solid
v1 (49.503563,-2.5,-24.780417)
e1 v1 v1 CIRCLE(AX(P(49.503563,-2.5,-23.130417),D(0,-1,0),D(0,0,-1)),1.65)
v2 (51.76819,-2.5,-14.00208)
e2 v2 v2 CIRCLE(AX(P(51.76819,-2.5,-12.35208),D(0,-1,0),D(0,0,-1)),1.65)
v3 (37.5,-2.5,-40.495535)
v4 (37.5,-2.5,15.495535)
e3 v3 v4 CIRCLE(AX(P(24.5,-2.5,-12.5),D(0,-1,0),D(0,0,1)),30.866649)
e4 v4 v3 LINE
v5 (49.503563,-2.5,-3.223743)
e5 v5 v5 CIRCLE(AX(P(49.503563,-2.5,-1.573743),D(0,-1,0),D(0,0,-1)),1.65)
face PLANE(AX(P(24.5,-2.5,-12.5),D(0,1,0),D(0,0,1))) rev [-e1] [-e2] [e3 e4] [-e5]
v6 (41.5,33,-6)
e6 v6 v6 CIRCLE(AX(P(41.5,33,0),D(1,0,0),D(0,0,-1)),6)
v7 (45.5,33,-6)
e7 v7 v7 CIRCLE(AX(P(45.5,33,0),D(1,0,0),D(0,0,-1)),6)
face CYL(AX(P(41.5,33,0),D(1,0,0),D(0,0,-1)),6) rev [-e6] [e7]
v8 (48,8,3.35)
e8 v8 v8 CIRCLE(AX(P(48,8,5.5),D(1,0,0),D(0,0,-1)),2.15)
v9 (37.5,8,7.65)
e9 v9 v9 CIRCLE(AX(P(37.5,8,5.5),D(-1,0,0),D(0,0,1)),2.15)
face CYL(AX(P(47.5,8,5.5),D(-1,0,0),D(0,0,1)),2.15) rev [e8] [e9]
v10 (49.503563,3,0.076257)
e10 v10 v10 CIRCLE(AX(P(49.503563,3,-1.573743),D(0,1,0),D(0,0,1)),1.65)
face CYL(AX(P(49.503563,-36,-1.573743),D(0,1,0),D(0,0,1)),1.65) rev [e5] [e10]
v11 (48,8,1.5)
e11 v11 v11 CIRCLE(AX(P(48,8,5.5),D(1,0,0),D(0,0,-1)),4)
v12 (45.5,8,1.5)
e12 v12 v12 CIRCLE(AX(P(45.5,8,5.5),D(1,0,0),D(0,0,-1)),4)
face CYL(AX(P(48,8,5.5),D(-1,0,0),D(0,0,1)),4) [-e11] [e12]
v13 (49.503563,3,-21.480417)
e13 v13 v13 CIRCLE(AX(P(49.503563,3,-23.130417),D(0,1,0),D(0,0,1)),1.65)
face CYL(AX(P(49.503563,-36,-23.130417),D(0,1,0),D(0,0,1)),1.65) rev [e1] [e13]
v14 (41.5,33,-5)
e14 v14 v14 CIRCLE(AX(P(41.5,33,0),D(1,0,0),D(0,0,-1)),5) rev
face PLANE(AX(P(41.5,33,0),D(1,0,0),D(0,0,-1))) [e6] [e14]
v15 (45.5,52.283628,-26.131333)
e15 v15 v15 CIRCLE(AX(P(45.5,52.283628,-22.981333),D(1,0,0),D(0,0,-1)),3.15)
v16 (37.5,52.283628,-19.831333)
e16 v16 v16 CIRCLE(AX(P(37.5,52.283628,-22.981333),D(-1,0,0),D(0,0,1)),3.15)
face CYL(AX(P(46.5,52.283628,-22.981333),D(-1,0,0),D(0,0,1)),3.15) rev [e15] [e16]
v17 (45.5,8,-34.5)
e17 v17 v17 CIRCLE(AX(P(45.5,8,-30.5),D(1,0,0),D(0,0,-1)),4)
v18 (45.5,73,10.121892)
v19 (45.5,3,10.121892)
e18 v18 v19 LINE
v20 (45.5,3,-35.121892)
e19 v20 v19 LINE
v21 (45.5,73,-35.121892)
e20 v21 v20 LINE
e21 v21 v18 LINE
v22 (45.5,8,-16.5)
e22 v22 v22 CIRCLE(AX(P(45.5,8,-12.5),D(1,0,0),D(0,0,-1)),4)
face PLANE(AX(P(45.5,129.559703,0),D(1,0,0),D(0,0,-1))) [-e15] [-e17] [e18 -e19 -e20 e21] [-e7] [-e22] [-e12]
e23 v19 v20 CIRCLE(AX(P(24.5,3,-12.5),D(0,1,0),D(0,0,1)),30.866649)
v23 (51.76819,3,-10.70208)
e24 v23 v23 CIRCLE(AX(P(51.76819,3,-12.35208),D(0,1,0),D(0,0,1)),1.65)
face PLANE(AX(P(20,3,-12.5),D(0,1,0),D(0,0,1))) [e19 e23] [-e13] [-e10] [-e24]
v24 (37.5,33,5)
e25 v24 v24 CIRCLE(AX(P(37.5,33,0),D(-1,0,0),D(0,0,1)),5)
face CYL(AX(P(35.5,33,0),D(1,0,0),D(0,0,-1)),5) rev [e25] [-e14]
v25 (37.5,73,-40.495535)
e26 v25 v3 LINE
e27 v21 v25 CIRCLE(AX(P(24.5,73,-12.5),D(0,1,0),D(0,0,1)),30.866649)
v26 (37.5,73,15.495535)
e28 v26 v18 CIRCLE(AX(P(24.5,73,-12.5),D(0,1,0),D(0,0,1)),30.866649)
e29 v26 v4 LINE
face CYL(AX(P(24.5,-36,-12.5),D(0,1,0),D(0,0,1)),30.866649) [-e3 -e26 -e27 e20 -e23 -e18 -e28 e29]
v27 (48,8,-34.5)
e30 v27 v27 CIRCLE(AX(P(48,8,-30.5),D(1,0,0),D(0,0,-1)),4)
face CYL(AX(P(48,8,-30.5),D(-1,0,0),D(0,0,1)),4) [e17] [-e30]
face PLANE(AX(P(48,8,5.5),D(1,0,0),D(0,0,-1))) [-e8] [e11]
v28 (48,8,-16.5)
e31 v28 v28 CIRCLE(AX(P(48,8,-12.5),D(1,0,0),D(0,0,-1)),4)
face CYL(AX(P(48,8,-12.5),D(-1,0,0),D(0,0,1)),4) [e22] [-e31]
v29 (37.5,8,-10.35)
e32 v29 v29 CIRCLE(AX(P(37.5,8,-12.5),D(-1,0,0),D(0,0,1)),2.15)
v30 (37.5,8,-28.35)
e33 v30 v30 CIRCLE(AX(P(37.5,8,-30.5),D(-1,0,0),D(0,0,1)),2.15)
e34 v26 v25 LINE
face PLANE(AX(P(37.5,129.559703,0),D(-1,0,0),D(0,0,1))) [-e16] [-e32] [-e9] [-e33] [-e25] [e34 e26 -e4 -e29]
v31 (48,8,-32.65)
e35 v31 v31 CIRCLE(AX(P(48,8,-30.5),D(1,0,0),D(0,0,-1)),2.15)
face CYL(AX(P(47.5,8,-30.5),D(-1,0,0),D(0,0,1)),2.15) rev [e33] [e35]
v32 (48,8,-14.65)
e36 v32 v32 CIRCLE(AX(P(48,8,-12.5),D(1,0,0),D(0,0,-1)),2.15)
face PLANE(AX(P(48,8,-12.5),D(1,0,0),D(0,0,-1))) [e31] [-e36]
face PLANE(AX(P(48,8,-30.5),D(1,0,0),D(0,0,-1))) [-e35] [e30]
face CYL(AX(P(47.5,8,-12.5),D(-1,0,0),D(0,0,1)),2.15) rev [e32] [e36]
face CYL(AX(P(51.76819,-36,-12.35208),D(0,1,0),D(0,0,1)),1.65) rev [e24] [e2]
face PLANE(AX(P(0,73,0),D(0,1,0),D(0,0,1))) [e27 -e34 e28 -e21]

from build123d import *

# Parameters (mm, degrees)
SKETCH1_R                = 28
BOSS_EXTRUDE1_DEPTH      = 3
SKETCH2_R                = 1.625
CUT_EXTRUDE1_DEPTH       = 3
BOSS_EXTRUDE4_START      = 3
BOSS_EXTRUDE4_OUTLINE_R  = 1.625
BOSS_EXTRUDE4_DEPTH      = 70
BOSS_EXTRUDE6_DEPTH      = 7
CUT_EXTRUDE13_START      = -10
CUT_EXTRUDE13_DEPTH      = 10
SKETCH14_R               = 6
CUT_EXTRUDE7_DEPTH       = 4
SKETCH15_R               = 5
CUT_EXTRUDE8_DEPTH       = 37
SKETCH17_R               = 2.15
CUT_EXTRUDE10_DEPTH      = 15.8
CUT_EXTRUDE11_DEPTH      = 5
CUT_EXTRUDE12_START      = -3
CUT_EXTRUDE12_DEPTH      = 3
SKETCH21_W               = 20.621892052
SKETCH21_H               = 10
BOSS_EXTRUDE7_DEPTH      = 7
SKETCH23_R               = 2.15
CUT_EXTRUDE17_DEPTH      = 23
SKETCH25_W               = 2
SKETCH25_H               = 4.7
CUT_EXTRUDE19_DEPTH      = 5
SKETCH26_W               = 20.621892052
SKETCH26_H               = 58
CUT_EXTRUDE21_DEPTH      = 5
CUT_EXTRUDE22_DEPTH      = 5
SKETCH41_R               = 1.625
CUT_EXTRUDE23_DEPTH      = 70
CUT_EXTRUDE24_START      = -39
CUT_EXTRUDE24_DEPTH      = 39
BOSS_EXTRUDE12_START     = -3
SKETCH43_R               = 30.866648668
BOSS_EXTRUDE12_DEPTH     = 3
BOSS_EXTRUDE13_DEPTH     = 70
BOSS_EXTRUDE14_DEPTH     = 70
SKETCH47_R               = 1.625
SKETCH47_R_2             = 1.65
CUT_EXTRUDE26_DEPTH      = 39
SKETCH48_R               = 3.15
CUT_EXTRUDE27_DEPTH      = 39
SKETCH49_R               = 5
CUT_EXTRUDE28_DEPTH      = 10
SKETCH50_R               = 6
CUT_EXTRUDE29_DEPTH      = 4
SKETCH51_R               = 3
CUT_EXTRUDE30_DEPTH      = 2.5
CUT_EXTRUDE31_DEPTH      = 82
CUT_EXTRUDE31_DEPTH_BACK = 10
SKETCH53_R               = 2.15
CUT_EXTRUDE32_DEPTH      = 10
SKETCH54_R               = 4
SKETCH54_R_2             = 2.15
BOSS_EXTRUDE15_DEPTH     = 2.5
SKETCH55_R               = 1.65
BOSS_EXTRUDE16_DEPTH     = 2.5


# Read off the part's stored shape, not the designer's step: Boss-Extrude4, Cut-Extrude13
with BuildPart() as part:
    # Sketch1 → Boss-Extrude1 (new body)
    with BuildSketch(Plane(origin=(0, 0, 0), x_dir=(1, 0, 0), z_dir=(0, 1, 0))):
        with Locations(Location((20, 12.5, 0), (0, 0, 270))):
            Circle(SKETCH1_R)
    extrude(amount=BOSS_EXTRUDE1_DEPTH)

    # Sketch2 → Cut-Extrude1 (cut)
    with BuildSketch(Plane(origin=(0, 3, 0), x_dir=(1, 0, 0), z_dir=(0, 1, 0))):
        with Locations(Location((20, 19.5, 0), (0, 0, 270))):
            Circle(SKETCH2_R)
        with Locations(Location((20, 5.5, 0), (0, 0, 270))):
            Circle(SKETCH2_R)
        with Locations(Location((20, 12.5, 0), (0, 0, 270))):
            Circle(SKETCH2_R)
    extrude(amount=-CUT_EXTRUDE1_DEPTH, mode=Mode.SUBTRACT)

    # Boss-Extrude4 outline → Boss-Extrude4 (add)
    with BuildSketch(Plane(origin=(0, 0, 0), x_dir=(1, 0, 0), z_dir=(0, 1, 0)).offset(BOSS_EXTRUDE4_START)):
        with BuildLine():
            ThreePointArc((3.5, -10.121892052), (48, 12.5), (3.5, 35.121892052))
            Line((3.5, 35.121892052), (3.5, -10.121892052))
        make_face()
        with Locations((20, 5.5)):
            Circle(BOSS_EXTRUDE4_OUTLINE_R, mode=Mode.SUBTRACT)
        with Locations((20, 12.5)):
            Circle(BOSS_EXTRUDE4_OUTLINE_R, mode=Mode.SUBTRACT)
        with Locations((20, 19.5)):
            Circle(BOSS_EXTRUDE4_OUTLINE_R, mode=Mode.SUBTRACT)
    extrude(amount=BOSS_EXTRUDE4_DEPTH)

    # Sketch13 → Boss-Extrude6 (add)
    with BuildSketch(Plane.ZY.offset(-3.5)):
        Polygon((-10, 23), (10, 23), (10.121892052, 23), (10.121892052, 15), (10, 15), (-10, 15), (-10.5, 15), (-10.5, 23), align=None)
    extrude(amount=BOSS_EXTRUDE6_DEPTH)

    # Cut-Extrude13 outline → Cut-Extrude13 (cut)
    with BuildSketch(Plane.ZY.offset(-3.5).offset(CUT_EXTRUDE13_START)):
        with BuildLine():
            Line((-10.5, 33), (-10.5, 23))
            Line((-10.5, 23), (10.121892052, 23))
            Line((10.121892052, 23), (10.121892052, 35.792364821))
            ThreePointArc((10.121892052, 35.792364821), (-1.408923961, 43.405043646), (-10.5, 33))
        make_face()
    extrude(amount=CUT_EXTRUDE13_DEPTH, mode=Mode.SUBTRACT)

    # Sketch14 → Cut-Extrude7 (cut)
    with BuildSketch(Plane.ZY.offset(-3.5)):
        with Locations((-22.981333294, 52.283628291)):
            Circle(SKETCH14_R)
    extrude(amount=-CUT_EXTRUDE7_DEPTH, mode=Mode.SUBTRACT)

    # Sketch15 → Cut-Extrude8 (cut)
    with BuildSketch(Plane.ZY.offset(-7.5)):
        with Locations((-22.981333294, 52.283628291)):
            Circle(SKETCH15_R)
    extrude(amount=-CUT_EXTRUDE8_DEPTH, mode=Mode.SUBTRACT)

    # Sketch17 → Cut-Extrude10 (cut)
    with BuildSketch(Plane.ZY.offset(3.5)):
        with Locations((-5, 18.2)):
            Circle(SKETCH17_R)
        with Locations((5, 18.2)):
            Circle(SKETCH17_R)
    extrude(amount=-CUT_EXTRUDE10_DEPTH, mode=Mode.SUBTRACT)

    # Sketch18 → Cut-Extrude11 (cut)
    with BuildSketch(Plane.ZY.offset(3.5)):
        Polygon((-0.189053974, 23), (1, 23), (1, 18), (-1, 18), (-1, 23), align=None)
    extrude(amount=-CUT_EXTRUDE11_DEPTH, mode=Mode.SUBTRACT)

    # Sketch19 → Cut-Extrude12 (cut)
    with BuildSketch(Plane.ZY.offset(-3.5).offset(CUT_EXTRUDE12_START)):
        with BuildLine():
            Line((10.121892052, 63), (10.121892052, 35.792364821))
            ThreePointArc((10.121892052, 35.792364821), (-1.408923961, 43.405043646), (-10.5, 33))
            Line((-10.5, 33), (-10.5, 62))
            Line((-10.5, 62), (-10.5, 63))
            Line((-10.5, 63), (10.121892052, 63))
        make_face()
    extrude(amount=CUT_EXTRUDE12_DEPTH, mode=Mode.SUBTRACT)

    # Sketch21 → Boss-Extrude7 (add)
    with BuildSketch(Plane.ZY.offset(-3.5)):
        with Locations((-0.189053974, 68)):
            Rectangle(SKETCH21_W, SKETCH21_H)
    extrude(amount=BOSS_EXTRUDE7_DEPTH)

    # Sketch23 → Cut-Extrude17 (cut)
    with BuildSketch(Plane.ZY.offset(3.5)):
        with Locations((-5, 67.7)):
            Circle(SKETCH23_R)
        with Locations((5, 67.7)):
            Circle(SKETCH23_R)
    extrude(amount=-CUT_EXTRUDE17_DEPTH, mode=Mode.SUBTRACT)

    # Sketch25 → Cut-Extrude19 (cut)
    with BuildSketch(Plane.ZY.offset(3.5)):
        with Locations((0, 65.35)):
            Rectangle(SKETCH25_W, SKETCH25_H)
    extrude(amount=-CUT_EXTRUDE19_DEPTH, mode=Mode.SUBTRACT)

    # Sketch26 → Cut-Extrude21 (cut)
    with BuildSketch(Plane.ZY.offset(3.5)):
        with Locations((-0.189053974, 44)):
            Rectangle(SKETCH26_W, SKETCH26_H)
    extrude(amount=-CUT_EXTRUDE21_DEPTH, mode=Mode.SUBTRACT)

    # Sketch27 → Cut-Extrude22 (cut)
    with BuildSketch(Plane.ZY.offset(-6.5)):
        Polygon((10.121892052, 63), (-10.5, 63), (-10.5, 33), (10.121892052, 35.792364821), align=None)
    extrude(amount=-CUT_EXTRUDE22_DEPTH, mode=Mode.SUBTRACT)

    # Sketch41 → Cut-Extrude23 (cut)
    with BuildSketch(Plane(origin=(0, 73, 0), x_dir=(1, 0, 0), z_dir=(0, 1, 0))):
        with BuildLine():
            Line((11.5, 39.178643144), (11.5, 10.5))
            Line((11.5, 10.5), (11.5, -14.178643144))
            ThreePointArc((11.5, -14.178643144), (48, 12.5), (11.5, 39.178643144))
        make_face()
        with Locations(Location((20, 5.5, 0), (0, 0, 270))):
            Circle(SKETCH41_R, mode=Mode.SUBTRACT)
        with Locations(Location((20, 12.5, 0), (0, 0, 270))):
            Circle(SKETCH41_R, mode=Mode.SUBTRACT)
        with Locations(Location((20, 19.5, 0), (0, 0, 270))):
            Circle(SKETCH41_R, mode=Mode.SUBTRACT)
    extrude(amount=-CUT_EXTRUDE23_DEPTH, mode=Mode.SUBTRACT)

    # Sketch42 → Cut-Extrude24 (cut)
    with BuildSketch(Plane(origin=(0, 3, 0), x_dir=(1, 0, 0), z_dir=(0, 1, 0)).offset(CUT_EXTRUDE24_START)):
        with BuildLine():
            ThreePointArc((3.5, 35.121892052), (-6.366648668, 12.5), (3.5, -10.121892052))
            ThreePointArc((3.5, -10.121892052), (-8, 12.5), (3.5, 35.121892052))
        make_face()
    extrude(amount=CUT_EXTRUDE24_DEPTH, mode=Mode.SUBTRACT)

    # Sketch43 → Boss-Extrude12 (add)
    with BuildSketch(Plane(origin=(0, 3, 0), x_dir=(1, 0, 0), z_dir=(0, 1, 0)).offset(BOSS_EXTRUDE12_START)):
        with Locations(Location((24.5, 12.5, 0), (0, 0, 270))):
            Circle(SKETCH43_R)
    extrude(amount=BOSS_EXTRUDE12_DEPTH)

    # Sketch45 → Boss-Extrude13 (add)
    with BuildSketch(Plane(origin=(0, 3, 0), x_dir=(1, 0, 0), z_dir=(0, 1, 0))):
        with BuildLine():
            Line((11.5, 40.495535358), (11.5, 39.178643144))
            ThreePointArc((11.5, 39.178643144), (7.336497035, 37.472698946), (3.5, 35.121892052))
            ThreePointArc((3.5, 35.121892052), (7.288985777, 38.12286068), (11.5, 40.495535358))
        make_face()
        with BuildLine():
            Line((11.5, -14.178643144), (11.5, -15.495535358))
            ThreePointArc((11.5, -15.495535358), (7.288985777, -13.12286068), (3.5, -10.121892052))
            ThreePointArc((3.5, -10.121892052), (7.336497035, -12.472698946), (11.5, -14.178643144))
        make_face()
    extrude(amount=BOSS_EXTRUDE13_DEPTH)

    # Sketch46 → Boss-Extrude14 (add)
    with BuildSketch(Plane(origin=(0, 3, 0), x_dir=(1, 0, 0), z_dir=(0, 1, 0))):
        with BuildLine():
            Line((37.5, 40.495535358), (37.5, 12.5))
            Line((37.5, 12.5), (37.5, -15.495535358))
            ThreePointArc((37.5, -15.495535358), (41.711014223, -13.12286068), (45.5, -10.121892052))
            Line((45.5, -10.121892052), (45.5, 12.5))
            Line((45.5, 12.5), (45.5, 35.121892052))
            ThreePointArc((45.5, 35.121892052), (41.711014223, 38.12286068), (37.5, 40.495535358))
        make_face()
    extrude(amount=BOSS_EXTRUDE14_DEPTH)

    # Sketch47 → Cut-Extrude26 (cut)
    with BuildSketch(Plane(origin=(0, 3, 0), x_dir=(1, 0, 0), z_dir=(0, 1, 0))):
        with Locations(Location((24.638783134, 19.352080003, 0), (0, 0, 270))):
            Circle(SKETCH47_R)
        with Locations(Location((24.638783134, 12.352080003, 0), (0, 0, 270))):
            Circle(SKETCH47_R)
        with Locations(Location((24.638783134, -15.204594071, 0), (0, 0, 270))):
            Circle(SKETCH47_R)
        with Locations(Location((0.774003343, -1.426257034, 0), (0, 0, 270))):
            Circle(SKETCH47_R)
        with Locations(Location((0.774003343, 26.13041704, 0), (0, 0, 270))):
            Circle(SKETCH47_R)
        with Locations(Location((24.638783134, 39.908754076, 0), (0, 0, 270))):
            Circle(SKETCH47_R)
        with Locations(Location((30.700960961, 15.852080003, 0), (0, 0, 270))):
            Circle(SKETCH47_R)
        with Locations(Location((-2.490624188, 12.352080003, 0), (0, 0, 270))):
            Circle(SKETCH47_R)
        with Locations(Location((51.768190456, 12.352080003, 0), (0, 0, 270))):
            Circle(SKETCH47_R_2)
        with Locations(Location((24.638783134, 26.13041704, 0), (0, 0, 270))):
            Circle(SKETCH47_R)
        with Locations(Location((24.638783134, -1.426257034, 0), (0, 0, 270))):
            Circle(SKETCH47_R)
        with Locations(Location((30.700960961, 8.852080003, 0), (0, 0, 270))):
            Circle(SKETCH47_R)
        with Locations(Location((24.638783134, 5.352080003, 0), (0, 0, 270))):
            Circle(SKETCH47_R)
        with Locations(Location((18.576605308, 8.852080003, 0), (0, 0, 270))):
            Circle(SKETCH47_R)
        with Locations(Location((18.576605308, 15.852080003, 0), (0, 0, 270))):
            Circle(SKETCH47_R)
        with Locations(Location((49.503562926, 1.573742966, 0), (0, 0, 270))):
            Circle(SKETCH47_R_2)
        with Locations(Location((49.503562926, 23.13041704, 0), (0, 0, 270))):
            Circle(SKETCH47_R_2)
    extrude(amount=-CUT_EXTRUDE26_DEPTH, mode=Mode.SUBTRACT)

    # Sketch48 → Cut-Extrude27 (cut)
    with BuildSketch(Plane.ZY.offset(-7.5)):
        with Locations((-22.981333294, 52.283628291)):
            Circle(SKETCH48_R)
    extrude(amount=-CUT_EXTRUDE27_DEPTH, mode=Mode.SUBTRACT)

    # Sketch49 → Cut-Extrude28 (cut)
    with BuildSketch(Plane(origin=(45.5, 0, 0), x_dir=(0, 0, -1), z_dir=(1, 0, 0))):
        with Locations((0, 33)):
            Circle(SKETCH49_R)
    extrude(amount=-CUT_EXTRUDE28_DEPTH, mode=Mode.SUBTRACT)

    # Sketch50 → Cut-Extrude29 (cut)
    with BuildSketch(Plane(origin=(45.5, 0, 0), x_dir=(0, 0, -1), z_dir=(1, 0, 0))):
        with Locations((0, 33)):
            Circle(SKETCH50_R)
    extrude(amount=-CUT_EXTRUDE29_DEPTH, mode=Mode.SUBTRACT)

    # Sketch51 → Cut-Extrude30 (cut)
    with BuildSketch(Plane(origin=(11.5, 0, 0), x_dir=(0, 0, -1), z_dir=(1, 0, 0))):
        with Locations((-5, 18.2)):
            Circle(SKETCH51_R)
        with Locations((5, 18.2)):
            Circle(SKETCH51_R)
        with Locations((-5, 67.7)):
            Circle(SKETCH51_R)
        with Locations((5, 67.7)):
            Circle(SKETCH51_R)
    extrude(amount=-CUT_EXTRUDE30_DEPTH, mode=Mode.SUBTRACT)

    # Sketch52 → Cut-Extrude31 (cut, two sides: drawn at the far end of the back side and taken through both)
    with BuildSketch(Plane(origin=(0, 3, 0), x_dir=(1, 0, 0), z_dir=(0, 1, 0)).offset(-CUT_EXTRUDE31_DEPTH_BACK)):
        with BuildLine():
            Line((37.5, 40.495535358), (37.5, -15.495535358))
            ThreePointArc((37.5, -15.495535358), (-6.366648668, 12.5), (37.5, 40.495535358))
        make_face()
    extrude(amount=CUT_EXTRUDE31_DEPTH + CUT_EXTRUDE31_DEPTH_BACK, mode=Mode.SUBTRACT)


with BuildPart() as cut_extrude31_kept_piece:
    # of the separate pieces the step leaves, the one the design keeps (cut_extrude31_pieces_kept)
    add(part.part.solids().sort_by_distance((37.5, 0, 15.495535358))[0])

    # Sketch53 → Cut-Extrude32 (cut)
    with BuildSketch(Plane.ZY.offset(-37.5)):
        with Locations((-30.5, 8)):
            Circle(SKETCH53_R)
        with Locations((-12.5, 8)):
            Circle(SKETCH53_R)
        with Locations((5.5, 8)):
            Circle(SKETCH53_R)
    extrude(amount=-CUT_EXTRUDE32_DEPTH, mode=Mode.SUBTRACT)

    # Sketch54 → Boss-Extrude15 (add)
    # profile 1 of 3: a face of its own
    with BuildSketch(Plane(origin=(45.5, 0, 0), x_dir=(0, 0, -1), z_dir=(1, 0, 0))):
        with Locations((-5.5, 8)):
            Circle(SKETCH54_R)
        with Locations(Location((-5.5, 8, 0), (0, 0, 180))):
            Circle(SKETCH54_R_2, mode=Mode.SUBTRACT)
    # profile 2 of 3: a face of its own
    with BuildSketch(Plane(origin=(45.5, 0, 0), x_dir=(0, 0, -1), z_dir=(1, 0, 0))):
        with Locations((12.5, 8)):
            Circle(SKETCH54_R)
        with Locations(Location((12.5, 8, 0), (0, 0, 180))):
            Circle(SKETCH54_R_2, mode=Mode.SUBTRACT)
    # profile 3 of 3: a face of its own
    with BuildSketch(Plane(origin=(45.5, 0, 0), x_dir=(0, 0, -1), z_dir=(1, 0, 0))):
        with Locations((30.5, 8)):
            Circle(SKETCH54_R)
        with Locations(Location((30.5, 8, 0), (0, 0, 180))):
            Circle(SKETCH54_R_2, mode=Mode.SUBTRACT)
    extrude(amount=BOSS_EXTRUDE15_DEPTH)

    # Sketch55 → Boss-Extrude16 (add)
    with BuildSketch(Plane.XZ):
        with BuildLine():
            Line((37.5, 15.495535358), (37.5, -40.495535358))
            ThreePointArc((37.5, -40.495535358), (55.366648668, -12.5), (37.5, 15.495535358))
        make_face()
        with Locations(Location((49.503562926, -1.573742966, 0), (0, 0, 90))):
            Circle(SKETCH55_R, mode=Mode.SUBTRACT)
        with Locations(Location((51.768190456, -12.352080003, 0), (0, 0, 90))):
            Circle(SKETCH55_R, mode=Mode.SUBTRACT)
        with Locations(Location((49.503562926, -23.13041704, 0), (0, 0, 90))):
            Circle(SKETCH55_R, mode=Mode.SUBTRACT)
    extrude(amount=BOSS_EXTRUDE16_DEPTH)


solid = cut_extrude31_kept_piece.part
